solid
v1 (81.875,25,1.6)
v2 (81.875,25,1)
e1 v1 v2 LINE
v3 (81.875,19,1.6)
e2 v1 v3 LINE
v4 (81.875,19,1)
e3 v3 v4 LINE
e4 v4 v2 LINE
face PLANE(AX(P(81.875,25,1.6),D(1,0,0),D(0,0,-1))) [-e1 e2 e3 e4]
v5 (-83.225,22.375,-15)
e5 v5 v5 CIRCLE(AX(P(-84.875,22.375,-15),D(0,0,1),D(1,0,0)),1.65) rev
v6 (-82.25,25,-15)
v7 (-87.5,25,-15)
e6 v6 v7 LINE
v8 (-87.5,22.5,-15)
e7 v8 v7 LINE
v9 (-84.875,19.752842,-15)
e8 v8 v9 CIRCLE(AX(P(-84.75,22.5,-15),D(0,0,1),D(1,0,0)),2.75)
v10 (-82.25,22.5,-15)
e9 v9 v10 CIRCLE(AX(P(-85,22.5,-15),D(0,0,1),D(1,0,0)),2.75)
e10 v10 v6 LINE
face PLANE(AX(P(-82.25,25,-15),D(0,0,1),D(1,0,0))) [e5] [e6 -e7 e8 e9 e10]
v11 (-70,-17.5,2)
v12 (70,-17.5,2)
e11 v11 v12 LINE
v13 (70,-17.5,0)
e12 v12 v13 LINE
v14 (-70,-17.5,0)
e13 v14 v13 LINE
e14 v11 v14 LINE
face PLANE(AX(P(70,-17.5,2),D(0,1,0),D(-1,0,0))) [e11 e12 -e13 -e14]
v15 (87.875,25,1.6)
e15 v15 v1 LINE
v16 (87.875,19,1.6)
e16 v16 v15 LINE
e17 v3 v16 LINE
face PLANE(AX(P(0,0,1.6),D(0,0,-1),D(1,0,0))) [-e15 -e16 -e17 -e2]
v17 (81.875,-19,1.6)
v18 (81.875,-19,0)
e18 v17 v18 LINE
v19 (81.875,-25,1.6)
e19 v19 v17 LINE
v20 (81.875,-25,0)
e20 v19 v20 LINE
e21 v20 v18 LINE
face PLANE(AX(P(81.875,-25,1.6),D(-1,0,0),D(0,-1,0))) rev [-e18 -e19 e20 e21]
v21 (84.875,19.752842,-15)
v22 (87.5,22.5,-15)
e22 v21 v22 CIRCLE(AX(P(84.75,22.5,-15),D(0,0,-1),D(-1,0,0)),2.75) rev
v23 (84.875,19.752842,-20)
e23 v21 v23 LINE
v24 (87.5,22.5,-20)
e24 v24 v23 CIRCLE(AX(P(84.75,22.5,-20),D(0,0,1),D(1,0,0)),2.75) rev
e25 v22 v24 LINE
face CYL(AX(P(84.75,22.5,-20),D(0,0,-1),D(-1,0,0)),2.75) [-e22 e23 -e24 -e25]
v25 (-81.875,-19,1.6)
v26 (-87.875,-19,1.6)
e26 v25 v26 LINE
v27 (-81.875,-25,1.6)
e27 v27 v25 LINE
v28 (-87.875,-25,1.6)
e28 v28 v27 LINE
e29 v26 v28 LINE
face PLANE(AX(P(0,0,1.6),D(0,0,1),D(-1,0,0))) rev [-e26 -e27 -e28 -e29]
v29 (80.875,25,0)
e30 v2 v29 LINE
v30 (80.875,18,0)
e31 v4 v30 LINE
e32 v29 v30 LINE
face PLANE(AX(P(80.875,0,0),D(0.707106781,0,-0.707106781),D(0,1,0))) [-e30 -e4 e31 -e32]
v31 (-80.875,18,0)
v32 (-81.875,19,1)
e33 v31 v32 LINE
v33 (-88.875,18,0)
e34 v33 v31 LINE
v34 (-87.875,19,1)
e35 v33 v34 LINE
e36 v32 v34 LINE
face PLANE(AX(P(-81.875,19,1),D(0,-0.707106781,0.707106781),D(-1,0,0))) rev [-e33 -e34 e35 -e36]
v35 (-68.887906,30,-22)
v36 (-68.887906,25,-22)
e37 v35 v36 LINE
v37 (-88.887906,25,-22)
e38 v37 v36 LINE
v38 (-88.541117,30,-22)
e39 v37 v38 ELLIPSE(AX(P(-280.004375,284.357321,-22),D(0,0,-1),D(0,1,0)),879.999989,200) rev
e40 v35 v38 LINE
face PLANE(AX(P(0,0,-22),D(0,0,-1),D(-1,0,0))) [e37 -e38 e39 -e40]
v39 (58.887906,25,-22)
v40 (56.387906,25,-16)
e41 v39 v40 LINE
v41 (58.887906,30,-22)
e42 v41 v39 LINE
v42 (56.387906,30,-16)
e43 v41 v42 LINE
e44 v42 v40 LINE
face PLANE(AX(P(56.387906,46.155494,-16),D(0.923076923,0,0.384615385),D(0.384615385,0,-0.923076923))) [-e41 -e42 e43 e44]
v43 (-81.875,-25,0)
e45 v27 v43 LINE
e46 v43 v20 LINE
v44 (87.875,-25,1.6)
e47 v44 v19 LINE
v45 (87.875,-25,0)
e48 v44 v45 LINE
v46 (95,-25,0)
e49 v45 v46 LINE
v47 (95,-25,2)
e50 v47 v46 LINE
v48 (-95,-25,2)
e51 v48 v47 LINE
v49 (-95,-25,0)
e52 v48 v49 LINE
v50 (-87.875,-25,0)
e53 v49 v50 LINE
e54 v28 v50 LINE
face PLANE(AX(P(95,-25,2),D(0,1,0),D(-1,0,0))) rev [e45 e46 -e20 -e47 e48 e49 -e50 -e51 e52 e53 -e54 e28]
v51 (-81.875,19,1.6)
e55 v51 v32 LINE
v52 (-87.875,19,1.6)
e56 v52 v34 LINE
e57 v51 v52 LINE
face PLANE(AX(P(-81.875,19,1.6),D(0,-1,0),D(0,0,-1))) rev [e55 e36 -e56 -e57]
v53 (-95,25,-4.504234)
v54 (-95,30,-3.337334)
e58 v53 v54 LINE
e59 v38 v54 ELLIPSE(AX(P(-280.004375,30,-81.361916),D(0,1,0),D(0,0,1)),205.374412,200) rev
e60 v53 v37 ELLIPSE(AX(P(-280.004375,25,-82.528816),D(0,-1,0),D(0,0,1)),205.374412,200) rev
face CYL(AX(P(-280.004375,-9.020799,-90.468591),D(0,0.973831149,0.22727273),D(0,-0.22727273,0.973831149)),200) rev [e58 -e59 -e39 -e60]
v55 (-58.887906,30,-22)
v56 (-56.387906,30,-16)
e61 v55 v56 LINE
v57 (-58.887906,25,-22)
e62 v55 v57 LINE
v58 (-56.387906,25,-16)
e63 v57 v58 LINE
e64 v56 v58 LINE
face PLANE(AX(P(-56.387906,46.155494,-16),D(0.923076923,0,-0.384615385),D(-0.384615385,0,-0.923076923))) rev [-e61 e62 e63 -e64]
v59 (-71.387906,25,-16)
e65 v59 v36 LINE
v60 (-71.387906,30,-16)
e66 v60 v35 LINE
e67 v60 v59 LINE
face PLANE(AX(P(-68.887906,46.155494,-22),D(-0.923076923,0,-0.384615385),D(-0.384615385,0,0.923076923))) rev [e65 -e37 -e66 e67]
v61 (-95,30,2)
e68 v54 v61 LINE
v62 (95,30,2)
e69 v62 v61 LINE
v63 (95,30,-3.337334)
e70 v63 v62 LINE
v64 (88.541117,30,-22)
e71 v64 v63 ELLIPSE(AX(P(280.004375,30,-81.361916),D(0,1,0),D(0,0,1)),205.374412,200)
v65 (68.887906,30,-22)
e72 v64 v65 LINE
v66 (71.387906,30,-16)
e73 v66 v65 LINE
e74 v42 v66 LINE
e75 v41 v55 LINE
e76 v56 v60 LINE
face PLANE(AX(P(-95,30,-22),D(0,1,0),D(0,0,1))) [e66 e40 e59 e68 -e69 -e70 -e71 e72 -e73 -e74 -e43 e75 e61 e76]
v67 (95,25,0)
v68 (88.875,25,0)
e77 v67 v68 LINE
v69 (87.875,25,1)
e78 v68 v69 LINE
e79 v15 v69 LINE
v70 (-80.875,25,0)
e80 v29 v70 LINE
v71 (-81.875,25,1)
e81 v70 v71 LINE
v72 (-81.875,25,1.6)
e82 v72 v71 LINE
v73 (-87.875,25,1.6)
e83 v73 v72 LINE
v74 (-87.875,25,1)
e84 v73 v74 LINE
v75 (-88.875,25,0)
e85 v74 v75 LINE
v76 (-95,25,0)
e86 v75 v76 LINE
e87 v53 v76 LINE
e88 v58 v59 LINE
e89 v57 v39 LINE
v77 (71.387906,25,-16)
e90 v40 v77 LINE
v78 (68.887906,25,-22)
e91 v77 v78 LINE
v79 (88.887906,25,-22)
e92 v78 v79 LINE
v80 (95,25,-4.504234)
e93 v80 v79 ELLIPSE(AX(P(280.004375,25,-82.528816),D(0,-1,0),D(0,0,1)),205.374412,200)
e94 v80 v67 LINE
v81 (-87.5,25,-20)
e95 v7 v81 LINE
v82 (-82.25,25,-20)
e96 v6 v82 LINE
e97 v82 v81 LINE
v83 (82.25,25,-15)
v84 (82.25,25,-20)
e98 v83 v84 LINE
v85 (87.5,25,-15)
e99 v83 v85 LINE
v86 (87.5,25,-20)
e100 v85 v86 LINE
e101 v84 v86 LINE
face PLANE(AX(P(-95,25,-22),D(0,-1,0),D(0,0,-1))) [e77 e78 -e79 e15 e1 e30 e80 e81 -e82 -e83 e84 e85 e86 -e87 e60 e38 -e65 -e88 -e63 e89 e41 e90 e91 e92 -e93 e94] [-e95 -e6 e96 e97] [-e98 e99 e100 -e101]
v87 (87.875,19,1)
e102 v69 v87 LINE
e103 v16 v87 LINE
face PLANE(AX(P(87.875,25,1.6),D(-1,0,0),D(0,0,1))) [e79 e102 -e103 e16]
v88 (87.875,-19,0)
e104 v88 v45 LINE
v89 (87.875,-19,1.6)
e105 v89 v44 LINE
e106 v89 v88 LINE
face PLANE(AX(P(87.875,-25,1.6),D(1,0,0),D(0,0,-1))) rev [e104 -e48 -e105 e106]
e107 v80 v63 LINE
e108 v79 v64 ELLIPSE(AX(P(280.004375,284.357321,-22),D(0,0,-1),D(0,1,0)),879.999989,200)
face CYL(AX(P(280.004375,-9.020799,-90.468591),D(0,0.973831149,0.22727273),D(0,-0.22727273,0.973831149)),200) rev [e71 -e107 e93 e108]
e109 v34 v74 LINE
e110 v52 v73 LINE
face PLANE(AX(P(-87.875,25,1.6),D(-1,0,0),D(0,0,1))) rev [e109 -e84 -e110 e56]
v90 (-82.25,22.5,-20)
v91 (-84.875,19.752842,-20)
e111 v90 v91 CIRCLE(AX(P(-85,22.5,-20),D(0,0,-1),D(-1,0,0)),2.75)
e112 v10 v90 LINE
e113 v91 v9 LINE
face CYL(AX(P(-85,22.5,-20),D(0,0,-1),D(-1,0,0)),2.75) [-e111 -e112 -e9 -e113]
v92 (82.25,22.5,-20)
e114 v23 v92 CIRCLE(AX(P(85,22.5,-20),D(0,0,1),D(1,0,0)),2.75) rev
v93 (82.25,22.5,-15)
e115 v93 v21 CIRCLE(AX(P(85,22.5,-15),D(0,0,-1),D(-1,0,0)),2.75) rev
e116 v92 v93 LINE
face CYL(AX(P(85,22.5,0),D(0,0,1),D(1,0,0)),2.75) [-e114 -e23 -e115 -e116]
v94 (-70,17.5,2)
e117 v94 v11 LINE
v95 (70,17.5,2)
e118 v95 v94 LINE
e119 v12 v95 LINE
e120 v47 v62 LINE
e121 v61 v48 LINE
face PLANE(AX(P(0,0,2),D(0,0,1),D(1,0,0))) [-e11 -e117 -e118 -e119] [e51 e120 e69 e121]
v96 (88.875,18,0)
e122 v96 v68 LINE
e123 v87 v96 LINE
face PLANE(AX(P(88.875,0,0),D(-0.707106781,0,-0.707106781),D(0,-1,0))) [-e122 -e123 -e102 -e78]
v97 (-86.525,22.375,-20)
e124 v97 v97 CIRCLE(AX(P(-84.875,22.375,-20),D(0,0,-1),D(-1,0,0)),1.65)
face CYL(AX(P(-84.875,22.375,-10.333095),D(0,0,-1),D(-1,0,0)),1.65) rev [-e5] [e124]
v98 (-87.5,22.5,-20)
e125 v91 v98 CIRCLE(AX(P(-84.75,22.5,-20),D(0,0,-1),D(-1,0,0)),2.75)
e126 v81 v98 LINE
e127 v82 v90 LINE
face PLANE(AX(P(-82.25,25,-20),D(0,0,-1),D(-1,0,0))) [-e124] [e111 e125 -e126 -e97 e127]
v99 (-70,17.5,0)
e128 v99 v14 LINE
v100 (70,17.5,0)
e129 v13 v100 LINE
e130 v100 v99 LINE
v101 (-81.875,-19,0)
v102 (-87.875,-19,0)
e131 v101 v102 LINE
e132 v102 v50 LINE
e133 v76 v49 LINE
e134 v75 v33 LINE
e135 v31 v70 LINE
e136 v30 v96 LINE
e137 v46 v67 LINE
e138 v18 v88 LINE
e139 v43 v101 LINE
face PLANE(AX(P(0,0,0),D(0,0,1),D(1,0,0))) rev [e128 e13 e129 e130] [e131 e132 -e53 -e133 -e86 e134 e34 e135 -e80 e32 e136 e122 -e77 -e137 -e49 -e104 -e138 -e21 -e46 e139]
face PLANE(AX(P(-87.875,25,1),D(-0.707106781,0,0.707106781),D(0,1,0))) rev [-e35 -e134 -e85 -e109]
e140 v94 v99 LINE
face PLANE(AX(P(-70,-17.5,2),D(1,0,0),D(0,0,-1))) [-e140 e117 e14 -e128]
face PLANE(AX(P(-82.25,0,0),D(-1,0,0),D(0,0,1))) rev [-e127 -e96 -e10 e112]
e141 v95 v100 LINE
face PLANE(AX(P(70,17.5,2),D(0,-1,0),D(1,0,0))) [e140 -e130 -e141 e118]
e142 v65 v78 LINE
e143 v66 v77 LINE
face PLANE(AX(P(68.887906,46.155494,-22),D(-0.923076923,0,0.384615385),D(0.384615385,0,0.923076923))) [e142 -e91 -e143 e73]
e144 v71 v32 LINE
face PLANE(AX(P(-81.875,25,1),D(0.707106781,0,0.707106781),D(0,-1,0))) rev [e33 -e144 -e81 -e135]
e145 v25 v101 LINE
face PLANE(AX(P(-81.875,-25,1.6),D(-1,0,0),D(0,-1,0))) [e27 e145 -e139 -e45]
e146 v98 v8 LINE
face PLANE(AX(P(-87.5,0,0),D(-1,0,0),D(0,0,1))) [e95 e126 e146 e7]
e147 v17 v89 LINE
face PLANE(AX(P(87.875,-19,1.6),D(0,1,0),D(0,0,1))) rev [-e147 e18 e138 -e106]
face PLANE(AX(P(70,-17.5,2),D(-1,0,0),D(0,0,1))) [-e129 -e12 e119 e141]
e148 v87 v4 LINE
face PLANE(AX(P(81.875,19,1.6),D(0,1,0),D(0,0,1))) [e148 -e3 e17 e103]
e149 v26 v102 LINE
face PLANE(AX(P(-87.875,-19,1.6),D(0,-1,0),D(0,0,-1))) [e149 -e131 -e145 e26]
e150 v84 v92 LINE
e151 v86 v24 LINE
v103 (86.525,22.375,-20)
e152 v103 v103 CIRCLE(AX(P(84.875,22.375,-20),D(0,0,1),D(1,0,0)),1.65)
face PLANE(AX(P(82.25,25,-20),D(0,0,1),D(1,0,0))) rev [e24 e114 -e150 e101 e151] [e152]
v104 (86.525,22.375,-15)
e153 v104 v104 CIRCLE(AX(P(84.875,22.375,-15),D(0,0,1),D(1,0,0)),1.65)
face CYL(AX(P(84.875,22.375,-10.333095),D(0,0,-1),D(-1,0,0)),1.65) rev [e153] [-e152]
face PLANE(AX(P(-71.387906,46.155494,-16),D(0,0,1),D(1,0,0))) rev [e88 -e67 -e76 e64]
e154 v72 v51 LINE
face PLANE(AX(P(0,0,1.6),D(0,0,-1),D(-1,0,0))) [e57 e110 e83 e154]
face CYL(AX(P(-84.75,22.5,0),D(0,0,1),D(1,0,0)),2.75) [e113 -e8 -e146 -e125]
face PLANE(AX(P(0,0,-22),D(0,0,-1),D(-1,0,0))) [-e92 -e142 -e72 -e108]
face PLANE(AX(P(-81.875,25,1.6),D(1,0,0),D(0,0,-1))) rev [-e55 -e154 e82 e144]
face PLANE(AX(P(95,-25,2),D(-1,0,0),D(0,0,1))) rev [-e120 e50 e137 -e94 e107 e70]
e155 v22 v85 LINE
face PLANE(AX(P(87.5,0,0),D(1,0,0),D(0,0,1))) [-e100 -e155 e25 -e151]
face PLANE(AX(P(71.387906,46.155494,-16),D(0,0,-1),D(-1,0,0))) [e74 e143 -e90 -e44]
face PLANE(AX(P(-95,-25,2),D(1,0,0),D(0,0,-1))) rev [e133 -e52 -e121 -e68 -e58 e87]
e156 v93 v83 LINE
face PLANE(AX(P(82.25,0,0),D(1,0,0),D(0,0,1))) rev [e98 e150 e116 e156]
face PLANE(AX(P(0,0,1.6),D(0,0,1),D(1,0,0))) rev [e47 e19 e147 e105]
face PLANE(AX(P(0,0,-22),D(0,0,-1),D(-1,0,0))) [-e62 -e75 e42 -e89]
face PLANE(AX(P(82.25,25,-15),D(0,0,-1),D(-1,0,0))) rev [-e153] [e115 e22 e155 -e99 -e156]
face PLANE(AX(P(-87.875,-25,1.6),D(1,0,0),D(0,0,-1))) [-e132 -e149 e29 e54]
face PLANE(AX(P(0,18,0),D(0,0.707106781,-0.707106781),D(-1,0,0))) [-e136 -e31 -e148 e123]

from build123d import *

# Parameters (mm, degrees)
SKETCH1_W                = 190
SKETCH1_H                = 50
SKETCH1_W_2              = 140
SKETCH1_H_2              = 35
BOSS_EXTRUDE1_DEPTH      = 2
SKETCH3_W                = 190
SKETCH3_H                = 5
BOSS_EXTRUDE2_DEPTH      = 24
BOSS_EXTRUDE3_START      = -7.5
SKETCH6_W                = 5
SKETCH6_H                = 5.25
BOSS_EXTRUDE3_DEPTH      = 5.25
CUT_EXTRUDE1_DEPTH       = 108.905945309
SKETCH7_R                = 1.65
CUT_EXTRUDE2_DEPTH       = 5
FILLET1_R                = 2.75
FILLET1_OF_MIRROR3_R     = 2.75
CUT_EXTRUDE3_DEPTH       = 5
SKETCH10_W               = 6
SKETCH10_H               = 6
CUT_EXTRUDE4_DEPTH       = 1.6
CHAMFER1_SIZE            = 1
SKETCH12_W               = 6
SKETCH12_H               = 6
CUT_EXTRUDE5_DEPTH       = 1.6
CHAMFER1_OF_MIRROR5_SIZE = 1


with BuildPart() as part:
    # Sketch1 → Boss-Extrude1 (new body)
    with BuildSketch(Plane.XY):
        Rectangle(SKETCH1_W, SKETCH1_H)
        Rectangle(SKETCH1_W_2, SKETCH1_H_2, mode=Mode.SUBTRACT)
    extrude(amount=BOSS_EXTRUDE1_DEPTH)

    # Sketch3 → Boss-Extrude2 (add)
    with BuildSketch(Plane.XY.offset(2)):
        with Locations((0, 27.5)):
            Rectangle(SKETCH3_W, SKETCH3_H)
    extrude(amount=-BOSS_EXTRUDE2_DEPTH)

    # Sketch6 → Boss-Extrude3 (add)
    with BuildSketch(Plane.ZY.offset(95).offset(BOSS_EXTRUDE3_START)):
        with Locations((-17.5, 22.375)):
            Rectangle(SKETCH6_W, SKETCH6_H)
    boss_extrude3 = extrude(amount=-BOSS_EXTRUDE3_DEPTH)

    # Sketch5 → Cut-Extrude1 (cut, symmetric)
    with BuildSketch(Plane(origin=(0, 18.839521848, 4.396767931), x_dir=(1, 0, 0), z_dir=(0, 0.9738311486761368, 0.22727273014621918))):
        with BuildLine():
            Line((95, 28.242467175), (88.541117044, 28.242467175))
            ThreePointArc((88.541117044, 28.242467175), (91.551341518, 19.077417851), (95, 10.068181746))
            Line((95, 10.068181746), (95, 28.242467175))
        make_face()
    cut_extrude1 = extrude(amount=CUT_EXTRUDE1_DEPTH, both=True, mode=Mode.SUBTRACT)

    # Mirror1: Cut-Extrude1 across plane
    add(cut_extrude1.mirror(Plane(origin=(0, 0, 0), x_dir=(0, 0, 1), z_dir=(1, 0, 0))), mode=Mode.SUBTRACT)

    # Sketch7 → Cut-Extrude2 (cut)
    with BuildSketch(Plane(origin=(0, 0, -20), x_dir=(-1, 0, 0), z_dir=(0, 0, -1))):
        with Locations((84.875, 22.375)):
            Circle(SKETCH7_R)
    cut_extrude2 = extrude(amount=-CUT_EXTRUDE2_DEPTH, mode=Mode.SUBTRACT)

    # Fillet1
    # the kernel refuses this fillet: 2.75 mm, written as the material it takes off along each edge
    with BuildSketch(Plane(origin=(-87.5, 19.75, -8.125), x_dir=(0, 1, 0), z_dir=(0, 0, -1))) as fillet1_piece_1:
        with BuildLine():
            CenterArc((FILLET1_R, FILLET1_R), FILLET1_R, 180, 90)
            Line((0, FILLET1_R), (0, 0))
            Line((0, 0), (FILLET1_R, 0))
        make_face()
    extrude(amount=18.75, mode=Mode.SUBTRACT)
    with BuildSketch(Plane(origin=(-82.25, 19.75, -8.125), x_dir=(0, 1, 0), z_dir=(0, 0, -1))) as fillet1_piece_2:
        with BuildLine():
            CenterArc((FILLET1_R, -FILLET1_R), FILLET1_R, 90, 90)
            Line((0, -FILLET1_R), (0, 0))
            Line((0, 0), (FILLET1_R, 0))
        make_face()
    extrude(amount=18.75, mode=Mode.SUBTRACT)

    # Mirror3: Boss-Extrude3, Cut-Extrude2 across plane
    add(boss_extrude3.mirror(Plane(origin=(0, 0, 0), x_dir=(0, 0, 1), z_dir=(1, 0, 0))))
    add(cut_extrude2.mirror(Plane(origin=(0, 0, 0), x_dir=(0, 0, 1), z_dir=(1, 0, 0))), mode=Mode.SUBTRACT)

    # Fillet1 of Mirror3
    # the kernel refuses this fillet: 2.75 mm, written as the material it takes off along each edge
    with BuildSketch(Plane(origin=(87.5, 19.75, -8.125), x_dir=(0, 1, 0), z_dir=(0, 0, -1))) as fillet1_of_mirror3_piece_1:
        with BuildLine():
            CenterArc((FILLET1_OF_MIRROR3_R, -FILLET1_OF_MIRROR3_R), FILLET1_OF_MIRROR3_R, 90, 90)
            Line((0, -FILLET1_OF_MIRROR3_R), (0, 0))
            Line((0, 0), (FILLET1_OF_MIRROR3_R, 0))
        make_face()
    extrude(amount=18.75, mode=Mode.SUBTRACT)
    with BuildSketch(Plane(origin=(82.25, 19.75, -8.125), x_dir=(0, 1, 0), z_dir=(0, 0, -1))) as fillet1_of_mirror3_piece_2:
        with BuildLine():
            CenterArc((FILLET1_OF_MIRROR3_R, FILLET1_OF_MIRROR3_R), FILLET1_OF_MIRROR3_R, 180, 90)
            Line((0, FILLET1_OF_MIRROR3_R), (0, 0))
            Line((0, 0), (FILLET1_OF_MIRROR3_R, 0))
        make_face()
    extrude(amount=18.75, mode=Mode.SUBTRACT)

    # Sketch9 → Cut-Extrude3 (cut)
    with BuildSketch(Plane.XZ.offset(-25)):
        Polygon((-68.887905516, -22), (-71.387905516, -16), (-56.387905516, -16), (-58.887905516, -22), align=None)
    cut_extrude3 = extrude(amount=-CUT_EXTRUDE3_DEPTH, mode=Mode.SUBTRACT)

    # Mirror4: Cut-Extrude3 across plane
    add(cut_extrude3.mirror(Plane(origin=(0, 0, 0), x_dir=(0, 0, 1), z_dir=(1, 0, 0))), mode=Mode.SUBTRACT)

    # Sketch10 → Cut-Extrude4 (cut)
    with BuildSketch(Plane(origin=(0, 0, 0), x_dir=(-1, 0, 0), z_dir=(0, 0, -1))):
        with Locations((84.875, 22)):
            Rectangle(SKETCH10_W, SKETCH10_H)
    cut_extrude4 = extrude(amount=-CUT_EXTRUDE4_DEPTH, mode=Mode.SUBTRACT)

    # Chamfer1
    chamfer1_edges = [part.edges().sort_by_distance(p)[0] for p in [
        (-81.875, 22, 0),
        (-84.875, 19, 0),
        (-87.875, 22, 0),
    ]]
    chamfer(chamfer1_edges, length=CHAMFER1_SIZE)

    # Sketch12 → Cut-Extrude5 (cut)
    with BuildSketch(Plane(origin=(0, 0, 0), x_dir=(-1, 0, 0), z_dir=(0, 0, -1))):
        with Locations((-84.875, -22)):
            Rectangle(SKETCH12_W, SKETCH12_H)
    cut_extrude5 = extrude(amount=-CUT_EXTRUDE5_DEPTH, mode=Mode.SUBTRACT)

    # Mirror5: Cut-Extrude4, Cut-Extrude5 across plane
    add(cut_extrude4.mirror(Plane(origin=(0, 0, 0), x_dir=(0, 0, 1), z_dir=(1, 0, 0))), mode=Mode.SUBTRACT)
    add(cut_extrude5.mirror(Plane(origin=(0, 0, 0), x_dir=(0, 0, 1), z_dir=(1, 0, 0))), mode=Mode.SUBTRACT)

    # Chamfer1 of Mirror5
    chamfer1_of_mirror5_edges = [part.edges().sort_by_distance(p)[0] for p in [
        (81.875, 22, 0),
        (84.875, 19, 0),
        (87.875, 22, 0),
    ]]
    chamfer(chamfer1_of_mirror5_edges, length=CHAMFER1_OF_MIRROR5_SIZE)


solid = part.part
